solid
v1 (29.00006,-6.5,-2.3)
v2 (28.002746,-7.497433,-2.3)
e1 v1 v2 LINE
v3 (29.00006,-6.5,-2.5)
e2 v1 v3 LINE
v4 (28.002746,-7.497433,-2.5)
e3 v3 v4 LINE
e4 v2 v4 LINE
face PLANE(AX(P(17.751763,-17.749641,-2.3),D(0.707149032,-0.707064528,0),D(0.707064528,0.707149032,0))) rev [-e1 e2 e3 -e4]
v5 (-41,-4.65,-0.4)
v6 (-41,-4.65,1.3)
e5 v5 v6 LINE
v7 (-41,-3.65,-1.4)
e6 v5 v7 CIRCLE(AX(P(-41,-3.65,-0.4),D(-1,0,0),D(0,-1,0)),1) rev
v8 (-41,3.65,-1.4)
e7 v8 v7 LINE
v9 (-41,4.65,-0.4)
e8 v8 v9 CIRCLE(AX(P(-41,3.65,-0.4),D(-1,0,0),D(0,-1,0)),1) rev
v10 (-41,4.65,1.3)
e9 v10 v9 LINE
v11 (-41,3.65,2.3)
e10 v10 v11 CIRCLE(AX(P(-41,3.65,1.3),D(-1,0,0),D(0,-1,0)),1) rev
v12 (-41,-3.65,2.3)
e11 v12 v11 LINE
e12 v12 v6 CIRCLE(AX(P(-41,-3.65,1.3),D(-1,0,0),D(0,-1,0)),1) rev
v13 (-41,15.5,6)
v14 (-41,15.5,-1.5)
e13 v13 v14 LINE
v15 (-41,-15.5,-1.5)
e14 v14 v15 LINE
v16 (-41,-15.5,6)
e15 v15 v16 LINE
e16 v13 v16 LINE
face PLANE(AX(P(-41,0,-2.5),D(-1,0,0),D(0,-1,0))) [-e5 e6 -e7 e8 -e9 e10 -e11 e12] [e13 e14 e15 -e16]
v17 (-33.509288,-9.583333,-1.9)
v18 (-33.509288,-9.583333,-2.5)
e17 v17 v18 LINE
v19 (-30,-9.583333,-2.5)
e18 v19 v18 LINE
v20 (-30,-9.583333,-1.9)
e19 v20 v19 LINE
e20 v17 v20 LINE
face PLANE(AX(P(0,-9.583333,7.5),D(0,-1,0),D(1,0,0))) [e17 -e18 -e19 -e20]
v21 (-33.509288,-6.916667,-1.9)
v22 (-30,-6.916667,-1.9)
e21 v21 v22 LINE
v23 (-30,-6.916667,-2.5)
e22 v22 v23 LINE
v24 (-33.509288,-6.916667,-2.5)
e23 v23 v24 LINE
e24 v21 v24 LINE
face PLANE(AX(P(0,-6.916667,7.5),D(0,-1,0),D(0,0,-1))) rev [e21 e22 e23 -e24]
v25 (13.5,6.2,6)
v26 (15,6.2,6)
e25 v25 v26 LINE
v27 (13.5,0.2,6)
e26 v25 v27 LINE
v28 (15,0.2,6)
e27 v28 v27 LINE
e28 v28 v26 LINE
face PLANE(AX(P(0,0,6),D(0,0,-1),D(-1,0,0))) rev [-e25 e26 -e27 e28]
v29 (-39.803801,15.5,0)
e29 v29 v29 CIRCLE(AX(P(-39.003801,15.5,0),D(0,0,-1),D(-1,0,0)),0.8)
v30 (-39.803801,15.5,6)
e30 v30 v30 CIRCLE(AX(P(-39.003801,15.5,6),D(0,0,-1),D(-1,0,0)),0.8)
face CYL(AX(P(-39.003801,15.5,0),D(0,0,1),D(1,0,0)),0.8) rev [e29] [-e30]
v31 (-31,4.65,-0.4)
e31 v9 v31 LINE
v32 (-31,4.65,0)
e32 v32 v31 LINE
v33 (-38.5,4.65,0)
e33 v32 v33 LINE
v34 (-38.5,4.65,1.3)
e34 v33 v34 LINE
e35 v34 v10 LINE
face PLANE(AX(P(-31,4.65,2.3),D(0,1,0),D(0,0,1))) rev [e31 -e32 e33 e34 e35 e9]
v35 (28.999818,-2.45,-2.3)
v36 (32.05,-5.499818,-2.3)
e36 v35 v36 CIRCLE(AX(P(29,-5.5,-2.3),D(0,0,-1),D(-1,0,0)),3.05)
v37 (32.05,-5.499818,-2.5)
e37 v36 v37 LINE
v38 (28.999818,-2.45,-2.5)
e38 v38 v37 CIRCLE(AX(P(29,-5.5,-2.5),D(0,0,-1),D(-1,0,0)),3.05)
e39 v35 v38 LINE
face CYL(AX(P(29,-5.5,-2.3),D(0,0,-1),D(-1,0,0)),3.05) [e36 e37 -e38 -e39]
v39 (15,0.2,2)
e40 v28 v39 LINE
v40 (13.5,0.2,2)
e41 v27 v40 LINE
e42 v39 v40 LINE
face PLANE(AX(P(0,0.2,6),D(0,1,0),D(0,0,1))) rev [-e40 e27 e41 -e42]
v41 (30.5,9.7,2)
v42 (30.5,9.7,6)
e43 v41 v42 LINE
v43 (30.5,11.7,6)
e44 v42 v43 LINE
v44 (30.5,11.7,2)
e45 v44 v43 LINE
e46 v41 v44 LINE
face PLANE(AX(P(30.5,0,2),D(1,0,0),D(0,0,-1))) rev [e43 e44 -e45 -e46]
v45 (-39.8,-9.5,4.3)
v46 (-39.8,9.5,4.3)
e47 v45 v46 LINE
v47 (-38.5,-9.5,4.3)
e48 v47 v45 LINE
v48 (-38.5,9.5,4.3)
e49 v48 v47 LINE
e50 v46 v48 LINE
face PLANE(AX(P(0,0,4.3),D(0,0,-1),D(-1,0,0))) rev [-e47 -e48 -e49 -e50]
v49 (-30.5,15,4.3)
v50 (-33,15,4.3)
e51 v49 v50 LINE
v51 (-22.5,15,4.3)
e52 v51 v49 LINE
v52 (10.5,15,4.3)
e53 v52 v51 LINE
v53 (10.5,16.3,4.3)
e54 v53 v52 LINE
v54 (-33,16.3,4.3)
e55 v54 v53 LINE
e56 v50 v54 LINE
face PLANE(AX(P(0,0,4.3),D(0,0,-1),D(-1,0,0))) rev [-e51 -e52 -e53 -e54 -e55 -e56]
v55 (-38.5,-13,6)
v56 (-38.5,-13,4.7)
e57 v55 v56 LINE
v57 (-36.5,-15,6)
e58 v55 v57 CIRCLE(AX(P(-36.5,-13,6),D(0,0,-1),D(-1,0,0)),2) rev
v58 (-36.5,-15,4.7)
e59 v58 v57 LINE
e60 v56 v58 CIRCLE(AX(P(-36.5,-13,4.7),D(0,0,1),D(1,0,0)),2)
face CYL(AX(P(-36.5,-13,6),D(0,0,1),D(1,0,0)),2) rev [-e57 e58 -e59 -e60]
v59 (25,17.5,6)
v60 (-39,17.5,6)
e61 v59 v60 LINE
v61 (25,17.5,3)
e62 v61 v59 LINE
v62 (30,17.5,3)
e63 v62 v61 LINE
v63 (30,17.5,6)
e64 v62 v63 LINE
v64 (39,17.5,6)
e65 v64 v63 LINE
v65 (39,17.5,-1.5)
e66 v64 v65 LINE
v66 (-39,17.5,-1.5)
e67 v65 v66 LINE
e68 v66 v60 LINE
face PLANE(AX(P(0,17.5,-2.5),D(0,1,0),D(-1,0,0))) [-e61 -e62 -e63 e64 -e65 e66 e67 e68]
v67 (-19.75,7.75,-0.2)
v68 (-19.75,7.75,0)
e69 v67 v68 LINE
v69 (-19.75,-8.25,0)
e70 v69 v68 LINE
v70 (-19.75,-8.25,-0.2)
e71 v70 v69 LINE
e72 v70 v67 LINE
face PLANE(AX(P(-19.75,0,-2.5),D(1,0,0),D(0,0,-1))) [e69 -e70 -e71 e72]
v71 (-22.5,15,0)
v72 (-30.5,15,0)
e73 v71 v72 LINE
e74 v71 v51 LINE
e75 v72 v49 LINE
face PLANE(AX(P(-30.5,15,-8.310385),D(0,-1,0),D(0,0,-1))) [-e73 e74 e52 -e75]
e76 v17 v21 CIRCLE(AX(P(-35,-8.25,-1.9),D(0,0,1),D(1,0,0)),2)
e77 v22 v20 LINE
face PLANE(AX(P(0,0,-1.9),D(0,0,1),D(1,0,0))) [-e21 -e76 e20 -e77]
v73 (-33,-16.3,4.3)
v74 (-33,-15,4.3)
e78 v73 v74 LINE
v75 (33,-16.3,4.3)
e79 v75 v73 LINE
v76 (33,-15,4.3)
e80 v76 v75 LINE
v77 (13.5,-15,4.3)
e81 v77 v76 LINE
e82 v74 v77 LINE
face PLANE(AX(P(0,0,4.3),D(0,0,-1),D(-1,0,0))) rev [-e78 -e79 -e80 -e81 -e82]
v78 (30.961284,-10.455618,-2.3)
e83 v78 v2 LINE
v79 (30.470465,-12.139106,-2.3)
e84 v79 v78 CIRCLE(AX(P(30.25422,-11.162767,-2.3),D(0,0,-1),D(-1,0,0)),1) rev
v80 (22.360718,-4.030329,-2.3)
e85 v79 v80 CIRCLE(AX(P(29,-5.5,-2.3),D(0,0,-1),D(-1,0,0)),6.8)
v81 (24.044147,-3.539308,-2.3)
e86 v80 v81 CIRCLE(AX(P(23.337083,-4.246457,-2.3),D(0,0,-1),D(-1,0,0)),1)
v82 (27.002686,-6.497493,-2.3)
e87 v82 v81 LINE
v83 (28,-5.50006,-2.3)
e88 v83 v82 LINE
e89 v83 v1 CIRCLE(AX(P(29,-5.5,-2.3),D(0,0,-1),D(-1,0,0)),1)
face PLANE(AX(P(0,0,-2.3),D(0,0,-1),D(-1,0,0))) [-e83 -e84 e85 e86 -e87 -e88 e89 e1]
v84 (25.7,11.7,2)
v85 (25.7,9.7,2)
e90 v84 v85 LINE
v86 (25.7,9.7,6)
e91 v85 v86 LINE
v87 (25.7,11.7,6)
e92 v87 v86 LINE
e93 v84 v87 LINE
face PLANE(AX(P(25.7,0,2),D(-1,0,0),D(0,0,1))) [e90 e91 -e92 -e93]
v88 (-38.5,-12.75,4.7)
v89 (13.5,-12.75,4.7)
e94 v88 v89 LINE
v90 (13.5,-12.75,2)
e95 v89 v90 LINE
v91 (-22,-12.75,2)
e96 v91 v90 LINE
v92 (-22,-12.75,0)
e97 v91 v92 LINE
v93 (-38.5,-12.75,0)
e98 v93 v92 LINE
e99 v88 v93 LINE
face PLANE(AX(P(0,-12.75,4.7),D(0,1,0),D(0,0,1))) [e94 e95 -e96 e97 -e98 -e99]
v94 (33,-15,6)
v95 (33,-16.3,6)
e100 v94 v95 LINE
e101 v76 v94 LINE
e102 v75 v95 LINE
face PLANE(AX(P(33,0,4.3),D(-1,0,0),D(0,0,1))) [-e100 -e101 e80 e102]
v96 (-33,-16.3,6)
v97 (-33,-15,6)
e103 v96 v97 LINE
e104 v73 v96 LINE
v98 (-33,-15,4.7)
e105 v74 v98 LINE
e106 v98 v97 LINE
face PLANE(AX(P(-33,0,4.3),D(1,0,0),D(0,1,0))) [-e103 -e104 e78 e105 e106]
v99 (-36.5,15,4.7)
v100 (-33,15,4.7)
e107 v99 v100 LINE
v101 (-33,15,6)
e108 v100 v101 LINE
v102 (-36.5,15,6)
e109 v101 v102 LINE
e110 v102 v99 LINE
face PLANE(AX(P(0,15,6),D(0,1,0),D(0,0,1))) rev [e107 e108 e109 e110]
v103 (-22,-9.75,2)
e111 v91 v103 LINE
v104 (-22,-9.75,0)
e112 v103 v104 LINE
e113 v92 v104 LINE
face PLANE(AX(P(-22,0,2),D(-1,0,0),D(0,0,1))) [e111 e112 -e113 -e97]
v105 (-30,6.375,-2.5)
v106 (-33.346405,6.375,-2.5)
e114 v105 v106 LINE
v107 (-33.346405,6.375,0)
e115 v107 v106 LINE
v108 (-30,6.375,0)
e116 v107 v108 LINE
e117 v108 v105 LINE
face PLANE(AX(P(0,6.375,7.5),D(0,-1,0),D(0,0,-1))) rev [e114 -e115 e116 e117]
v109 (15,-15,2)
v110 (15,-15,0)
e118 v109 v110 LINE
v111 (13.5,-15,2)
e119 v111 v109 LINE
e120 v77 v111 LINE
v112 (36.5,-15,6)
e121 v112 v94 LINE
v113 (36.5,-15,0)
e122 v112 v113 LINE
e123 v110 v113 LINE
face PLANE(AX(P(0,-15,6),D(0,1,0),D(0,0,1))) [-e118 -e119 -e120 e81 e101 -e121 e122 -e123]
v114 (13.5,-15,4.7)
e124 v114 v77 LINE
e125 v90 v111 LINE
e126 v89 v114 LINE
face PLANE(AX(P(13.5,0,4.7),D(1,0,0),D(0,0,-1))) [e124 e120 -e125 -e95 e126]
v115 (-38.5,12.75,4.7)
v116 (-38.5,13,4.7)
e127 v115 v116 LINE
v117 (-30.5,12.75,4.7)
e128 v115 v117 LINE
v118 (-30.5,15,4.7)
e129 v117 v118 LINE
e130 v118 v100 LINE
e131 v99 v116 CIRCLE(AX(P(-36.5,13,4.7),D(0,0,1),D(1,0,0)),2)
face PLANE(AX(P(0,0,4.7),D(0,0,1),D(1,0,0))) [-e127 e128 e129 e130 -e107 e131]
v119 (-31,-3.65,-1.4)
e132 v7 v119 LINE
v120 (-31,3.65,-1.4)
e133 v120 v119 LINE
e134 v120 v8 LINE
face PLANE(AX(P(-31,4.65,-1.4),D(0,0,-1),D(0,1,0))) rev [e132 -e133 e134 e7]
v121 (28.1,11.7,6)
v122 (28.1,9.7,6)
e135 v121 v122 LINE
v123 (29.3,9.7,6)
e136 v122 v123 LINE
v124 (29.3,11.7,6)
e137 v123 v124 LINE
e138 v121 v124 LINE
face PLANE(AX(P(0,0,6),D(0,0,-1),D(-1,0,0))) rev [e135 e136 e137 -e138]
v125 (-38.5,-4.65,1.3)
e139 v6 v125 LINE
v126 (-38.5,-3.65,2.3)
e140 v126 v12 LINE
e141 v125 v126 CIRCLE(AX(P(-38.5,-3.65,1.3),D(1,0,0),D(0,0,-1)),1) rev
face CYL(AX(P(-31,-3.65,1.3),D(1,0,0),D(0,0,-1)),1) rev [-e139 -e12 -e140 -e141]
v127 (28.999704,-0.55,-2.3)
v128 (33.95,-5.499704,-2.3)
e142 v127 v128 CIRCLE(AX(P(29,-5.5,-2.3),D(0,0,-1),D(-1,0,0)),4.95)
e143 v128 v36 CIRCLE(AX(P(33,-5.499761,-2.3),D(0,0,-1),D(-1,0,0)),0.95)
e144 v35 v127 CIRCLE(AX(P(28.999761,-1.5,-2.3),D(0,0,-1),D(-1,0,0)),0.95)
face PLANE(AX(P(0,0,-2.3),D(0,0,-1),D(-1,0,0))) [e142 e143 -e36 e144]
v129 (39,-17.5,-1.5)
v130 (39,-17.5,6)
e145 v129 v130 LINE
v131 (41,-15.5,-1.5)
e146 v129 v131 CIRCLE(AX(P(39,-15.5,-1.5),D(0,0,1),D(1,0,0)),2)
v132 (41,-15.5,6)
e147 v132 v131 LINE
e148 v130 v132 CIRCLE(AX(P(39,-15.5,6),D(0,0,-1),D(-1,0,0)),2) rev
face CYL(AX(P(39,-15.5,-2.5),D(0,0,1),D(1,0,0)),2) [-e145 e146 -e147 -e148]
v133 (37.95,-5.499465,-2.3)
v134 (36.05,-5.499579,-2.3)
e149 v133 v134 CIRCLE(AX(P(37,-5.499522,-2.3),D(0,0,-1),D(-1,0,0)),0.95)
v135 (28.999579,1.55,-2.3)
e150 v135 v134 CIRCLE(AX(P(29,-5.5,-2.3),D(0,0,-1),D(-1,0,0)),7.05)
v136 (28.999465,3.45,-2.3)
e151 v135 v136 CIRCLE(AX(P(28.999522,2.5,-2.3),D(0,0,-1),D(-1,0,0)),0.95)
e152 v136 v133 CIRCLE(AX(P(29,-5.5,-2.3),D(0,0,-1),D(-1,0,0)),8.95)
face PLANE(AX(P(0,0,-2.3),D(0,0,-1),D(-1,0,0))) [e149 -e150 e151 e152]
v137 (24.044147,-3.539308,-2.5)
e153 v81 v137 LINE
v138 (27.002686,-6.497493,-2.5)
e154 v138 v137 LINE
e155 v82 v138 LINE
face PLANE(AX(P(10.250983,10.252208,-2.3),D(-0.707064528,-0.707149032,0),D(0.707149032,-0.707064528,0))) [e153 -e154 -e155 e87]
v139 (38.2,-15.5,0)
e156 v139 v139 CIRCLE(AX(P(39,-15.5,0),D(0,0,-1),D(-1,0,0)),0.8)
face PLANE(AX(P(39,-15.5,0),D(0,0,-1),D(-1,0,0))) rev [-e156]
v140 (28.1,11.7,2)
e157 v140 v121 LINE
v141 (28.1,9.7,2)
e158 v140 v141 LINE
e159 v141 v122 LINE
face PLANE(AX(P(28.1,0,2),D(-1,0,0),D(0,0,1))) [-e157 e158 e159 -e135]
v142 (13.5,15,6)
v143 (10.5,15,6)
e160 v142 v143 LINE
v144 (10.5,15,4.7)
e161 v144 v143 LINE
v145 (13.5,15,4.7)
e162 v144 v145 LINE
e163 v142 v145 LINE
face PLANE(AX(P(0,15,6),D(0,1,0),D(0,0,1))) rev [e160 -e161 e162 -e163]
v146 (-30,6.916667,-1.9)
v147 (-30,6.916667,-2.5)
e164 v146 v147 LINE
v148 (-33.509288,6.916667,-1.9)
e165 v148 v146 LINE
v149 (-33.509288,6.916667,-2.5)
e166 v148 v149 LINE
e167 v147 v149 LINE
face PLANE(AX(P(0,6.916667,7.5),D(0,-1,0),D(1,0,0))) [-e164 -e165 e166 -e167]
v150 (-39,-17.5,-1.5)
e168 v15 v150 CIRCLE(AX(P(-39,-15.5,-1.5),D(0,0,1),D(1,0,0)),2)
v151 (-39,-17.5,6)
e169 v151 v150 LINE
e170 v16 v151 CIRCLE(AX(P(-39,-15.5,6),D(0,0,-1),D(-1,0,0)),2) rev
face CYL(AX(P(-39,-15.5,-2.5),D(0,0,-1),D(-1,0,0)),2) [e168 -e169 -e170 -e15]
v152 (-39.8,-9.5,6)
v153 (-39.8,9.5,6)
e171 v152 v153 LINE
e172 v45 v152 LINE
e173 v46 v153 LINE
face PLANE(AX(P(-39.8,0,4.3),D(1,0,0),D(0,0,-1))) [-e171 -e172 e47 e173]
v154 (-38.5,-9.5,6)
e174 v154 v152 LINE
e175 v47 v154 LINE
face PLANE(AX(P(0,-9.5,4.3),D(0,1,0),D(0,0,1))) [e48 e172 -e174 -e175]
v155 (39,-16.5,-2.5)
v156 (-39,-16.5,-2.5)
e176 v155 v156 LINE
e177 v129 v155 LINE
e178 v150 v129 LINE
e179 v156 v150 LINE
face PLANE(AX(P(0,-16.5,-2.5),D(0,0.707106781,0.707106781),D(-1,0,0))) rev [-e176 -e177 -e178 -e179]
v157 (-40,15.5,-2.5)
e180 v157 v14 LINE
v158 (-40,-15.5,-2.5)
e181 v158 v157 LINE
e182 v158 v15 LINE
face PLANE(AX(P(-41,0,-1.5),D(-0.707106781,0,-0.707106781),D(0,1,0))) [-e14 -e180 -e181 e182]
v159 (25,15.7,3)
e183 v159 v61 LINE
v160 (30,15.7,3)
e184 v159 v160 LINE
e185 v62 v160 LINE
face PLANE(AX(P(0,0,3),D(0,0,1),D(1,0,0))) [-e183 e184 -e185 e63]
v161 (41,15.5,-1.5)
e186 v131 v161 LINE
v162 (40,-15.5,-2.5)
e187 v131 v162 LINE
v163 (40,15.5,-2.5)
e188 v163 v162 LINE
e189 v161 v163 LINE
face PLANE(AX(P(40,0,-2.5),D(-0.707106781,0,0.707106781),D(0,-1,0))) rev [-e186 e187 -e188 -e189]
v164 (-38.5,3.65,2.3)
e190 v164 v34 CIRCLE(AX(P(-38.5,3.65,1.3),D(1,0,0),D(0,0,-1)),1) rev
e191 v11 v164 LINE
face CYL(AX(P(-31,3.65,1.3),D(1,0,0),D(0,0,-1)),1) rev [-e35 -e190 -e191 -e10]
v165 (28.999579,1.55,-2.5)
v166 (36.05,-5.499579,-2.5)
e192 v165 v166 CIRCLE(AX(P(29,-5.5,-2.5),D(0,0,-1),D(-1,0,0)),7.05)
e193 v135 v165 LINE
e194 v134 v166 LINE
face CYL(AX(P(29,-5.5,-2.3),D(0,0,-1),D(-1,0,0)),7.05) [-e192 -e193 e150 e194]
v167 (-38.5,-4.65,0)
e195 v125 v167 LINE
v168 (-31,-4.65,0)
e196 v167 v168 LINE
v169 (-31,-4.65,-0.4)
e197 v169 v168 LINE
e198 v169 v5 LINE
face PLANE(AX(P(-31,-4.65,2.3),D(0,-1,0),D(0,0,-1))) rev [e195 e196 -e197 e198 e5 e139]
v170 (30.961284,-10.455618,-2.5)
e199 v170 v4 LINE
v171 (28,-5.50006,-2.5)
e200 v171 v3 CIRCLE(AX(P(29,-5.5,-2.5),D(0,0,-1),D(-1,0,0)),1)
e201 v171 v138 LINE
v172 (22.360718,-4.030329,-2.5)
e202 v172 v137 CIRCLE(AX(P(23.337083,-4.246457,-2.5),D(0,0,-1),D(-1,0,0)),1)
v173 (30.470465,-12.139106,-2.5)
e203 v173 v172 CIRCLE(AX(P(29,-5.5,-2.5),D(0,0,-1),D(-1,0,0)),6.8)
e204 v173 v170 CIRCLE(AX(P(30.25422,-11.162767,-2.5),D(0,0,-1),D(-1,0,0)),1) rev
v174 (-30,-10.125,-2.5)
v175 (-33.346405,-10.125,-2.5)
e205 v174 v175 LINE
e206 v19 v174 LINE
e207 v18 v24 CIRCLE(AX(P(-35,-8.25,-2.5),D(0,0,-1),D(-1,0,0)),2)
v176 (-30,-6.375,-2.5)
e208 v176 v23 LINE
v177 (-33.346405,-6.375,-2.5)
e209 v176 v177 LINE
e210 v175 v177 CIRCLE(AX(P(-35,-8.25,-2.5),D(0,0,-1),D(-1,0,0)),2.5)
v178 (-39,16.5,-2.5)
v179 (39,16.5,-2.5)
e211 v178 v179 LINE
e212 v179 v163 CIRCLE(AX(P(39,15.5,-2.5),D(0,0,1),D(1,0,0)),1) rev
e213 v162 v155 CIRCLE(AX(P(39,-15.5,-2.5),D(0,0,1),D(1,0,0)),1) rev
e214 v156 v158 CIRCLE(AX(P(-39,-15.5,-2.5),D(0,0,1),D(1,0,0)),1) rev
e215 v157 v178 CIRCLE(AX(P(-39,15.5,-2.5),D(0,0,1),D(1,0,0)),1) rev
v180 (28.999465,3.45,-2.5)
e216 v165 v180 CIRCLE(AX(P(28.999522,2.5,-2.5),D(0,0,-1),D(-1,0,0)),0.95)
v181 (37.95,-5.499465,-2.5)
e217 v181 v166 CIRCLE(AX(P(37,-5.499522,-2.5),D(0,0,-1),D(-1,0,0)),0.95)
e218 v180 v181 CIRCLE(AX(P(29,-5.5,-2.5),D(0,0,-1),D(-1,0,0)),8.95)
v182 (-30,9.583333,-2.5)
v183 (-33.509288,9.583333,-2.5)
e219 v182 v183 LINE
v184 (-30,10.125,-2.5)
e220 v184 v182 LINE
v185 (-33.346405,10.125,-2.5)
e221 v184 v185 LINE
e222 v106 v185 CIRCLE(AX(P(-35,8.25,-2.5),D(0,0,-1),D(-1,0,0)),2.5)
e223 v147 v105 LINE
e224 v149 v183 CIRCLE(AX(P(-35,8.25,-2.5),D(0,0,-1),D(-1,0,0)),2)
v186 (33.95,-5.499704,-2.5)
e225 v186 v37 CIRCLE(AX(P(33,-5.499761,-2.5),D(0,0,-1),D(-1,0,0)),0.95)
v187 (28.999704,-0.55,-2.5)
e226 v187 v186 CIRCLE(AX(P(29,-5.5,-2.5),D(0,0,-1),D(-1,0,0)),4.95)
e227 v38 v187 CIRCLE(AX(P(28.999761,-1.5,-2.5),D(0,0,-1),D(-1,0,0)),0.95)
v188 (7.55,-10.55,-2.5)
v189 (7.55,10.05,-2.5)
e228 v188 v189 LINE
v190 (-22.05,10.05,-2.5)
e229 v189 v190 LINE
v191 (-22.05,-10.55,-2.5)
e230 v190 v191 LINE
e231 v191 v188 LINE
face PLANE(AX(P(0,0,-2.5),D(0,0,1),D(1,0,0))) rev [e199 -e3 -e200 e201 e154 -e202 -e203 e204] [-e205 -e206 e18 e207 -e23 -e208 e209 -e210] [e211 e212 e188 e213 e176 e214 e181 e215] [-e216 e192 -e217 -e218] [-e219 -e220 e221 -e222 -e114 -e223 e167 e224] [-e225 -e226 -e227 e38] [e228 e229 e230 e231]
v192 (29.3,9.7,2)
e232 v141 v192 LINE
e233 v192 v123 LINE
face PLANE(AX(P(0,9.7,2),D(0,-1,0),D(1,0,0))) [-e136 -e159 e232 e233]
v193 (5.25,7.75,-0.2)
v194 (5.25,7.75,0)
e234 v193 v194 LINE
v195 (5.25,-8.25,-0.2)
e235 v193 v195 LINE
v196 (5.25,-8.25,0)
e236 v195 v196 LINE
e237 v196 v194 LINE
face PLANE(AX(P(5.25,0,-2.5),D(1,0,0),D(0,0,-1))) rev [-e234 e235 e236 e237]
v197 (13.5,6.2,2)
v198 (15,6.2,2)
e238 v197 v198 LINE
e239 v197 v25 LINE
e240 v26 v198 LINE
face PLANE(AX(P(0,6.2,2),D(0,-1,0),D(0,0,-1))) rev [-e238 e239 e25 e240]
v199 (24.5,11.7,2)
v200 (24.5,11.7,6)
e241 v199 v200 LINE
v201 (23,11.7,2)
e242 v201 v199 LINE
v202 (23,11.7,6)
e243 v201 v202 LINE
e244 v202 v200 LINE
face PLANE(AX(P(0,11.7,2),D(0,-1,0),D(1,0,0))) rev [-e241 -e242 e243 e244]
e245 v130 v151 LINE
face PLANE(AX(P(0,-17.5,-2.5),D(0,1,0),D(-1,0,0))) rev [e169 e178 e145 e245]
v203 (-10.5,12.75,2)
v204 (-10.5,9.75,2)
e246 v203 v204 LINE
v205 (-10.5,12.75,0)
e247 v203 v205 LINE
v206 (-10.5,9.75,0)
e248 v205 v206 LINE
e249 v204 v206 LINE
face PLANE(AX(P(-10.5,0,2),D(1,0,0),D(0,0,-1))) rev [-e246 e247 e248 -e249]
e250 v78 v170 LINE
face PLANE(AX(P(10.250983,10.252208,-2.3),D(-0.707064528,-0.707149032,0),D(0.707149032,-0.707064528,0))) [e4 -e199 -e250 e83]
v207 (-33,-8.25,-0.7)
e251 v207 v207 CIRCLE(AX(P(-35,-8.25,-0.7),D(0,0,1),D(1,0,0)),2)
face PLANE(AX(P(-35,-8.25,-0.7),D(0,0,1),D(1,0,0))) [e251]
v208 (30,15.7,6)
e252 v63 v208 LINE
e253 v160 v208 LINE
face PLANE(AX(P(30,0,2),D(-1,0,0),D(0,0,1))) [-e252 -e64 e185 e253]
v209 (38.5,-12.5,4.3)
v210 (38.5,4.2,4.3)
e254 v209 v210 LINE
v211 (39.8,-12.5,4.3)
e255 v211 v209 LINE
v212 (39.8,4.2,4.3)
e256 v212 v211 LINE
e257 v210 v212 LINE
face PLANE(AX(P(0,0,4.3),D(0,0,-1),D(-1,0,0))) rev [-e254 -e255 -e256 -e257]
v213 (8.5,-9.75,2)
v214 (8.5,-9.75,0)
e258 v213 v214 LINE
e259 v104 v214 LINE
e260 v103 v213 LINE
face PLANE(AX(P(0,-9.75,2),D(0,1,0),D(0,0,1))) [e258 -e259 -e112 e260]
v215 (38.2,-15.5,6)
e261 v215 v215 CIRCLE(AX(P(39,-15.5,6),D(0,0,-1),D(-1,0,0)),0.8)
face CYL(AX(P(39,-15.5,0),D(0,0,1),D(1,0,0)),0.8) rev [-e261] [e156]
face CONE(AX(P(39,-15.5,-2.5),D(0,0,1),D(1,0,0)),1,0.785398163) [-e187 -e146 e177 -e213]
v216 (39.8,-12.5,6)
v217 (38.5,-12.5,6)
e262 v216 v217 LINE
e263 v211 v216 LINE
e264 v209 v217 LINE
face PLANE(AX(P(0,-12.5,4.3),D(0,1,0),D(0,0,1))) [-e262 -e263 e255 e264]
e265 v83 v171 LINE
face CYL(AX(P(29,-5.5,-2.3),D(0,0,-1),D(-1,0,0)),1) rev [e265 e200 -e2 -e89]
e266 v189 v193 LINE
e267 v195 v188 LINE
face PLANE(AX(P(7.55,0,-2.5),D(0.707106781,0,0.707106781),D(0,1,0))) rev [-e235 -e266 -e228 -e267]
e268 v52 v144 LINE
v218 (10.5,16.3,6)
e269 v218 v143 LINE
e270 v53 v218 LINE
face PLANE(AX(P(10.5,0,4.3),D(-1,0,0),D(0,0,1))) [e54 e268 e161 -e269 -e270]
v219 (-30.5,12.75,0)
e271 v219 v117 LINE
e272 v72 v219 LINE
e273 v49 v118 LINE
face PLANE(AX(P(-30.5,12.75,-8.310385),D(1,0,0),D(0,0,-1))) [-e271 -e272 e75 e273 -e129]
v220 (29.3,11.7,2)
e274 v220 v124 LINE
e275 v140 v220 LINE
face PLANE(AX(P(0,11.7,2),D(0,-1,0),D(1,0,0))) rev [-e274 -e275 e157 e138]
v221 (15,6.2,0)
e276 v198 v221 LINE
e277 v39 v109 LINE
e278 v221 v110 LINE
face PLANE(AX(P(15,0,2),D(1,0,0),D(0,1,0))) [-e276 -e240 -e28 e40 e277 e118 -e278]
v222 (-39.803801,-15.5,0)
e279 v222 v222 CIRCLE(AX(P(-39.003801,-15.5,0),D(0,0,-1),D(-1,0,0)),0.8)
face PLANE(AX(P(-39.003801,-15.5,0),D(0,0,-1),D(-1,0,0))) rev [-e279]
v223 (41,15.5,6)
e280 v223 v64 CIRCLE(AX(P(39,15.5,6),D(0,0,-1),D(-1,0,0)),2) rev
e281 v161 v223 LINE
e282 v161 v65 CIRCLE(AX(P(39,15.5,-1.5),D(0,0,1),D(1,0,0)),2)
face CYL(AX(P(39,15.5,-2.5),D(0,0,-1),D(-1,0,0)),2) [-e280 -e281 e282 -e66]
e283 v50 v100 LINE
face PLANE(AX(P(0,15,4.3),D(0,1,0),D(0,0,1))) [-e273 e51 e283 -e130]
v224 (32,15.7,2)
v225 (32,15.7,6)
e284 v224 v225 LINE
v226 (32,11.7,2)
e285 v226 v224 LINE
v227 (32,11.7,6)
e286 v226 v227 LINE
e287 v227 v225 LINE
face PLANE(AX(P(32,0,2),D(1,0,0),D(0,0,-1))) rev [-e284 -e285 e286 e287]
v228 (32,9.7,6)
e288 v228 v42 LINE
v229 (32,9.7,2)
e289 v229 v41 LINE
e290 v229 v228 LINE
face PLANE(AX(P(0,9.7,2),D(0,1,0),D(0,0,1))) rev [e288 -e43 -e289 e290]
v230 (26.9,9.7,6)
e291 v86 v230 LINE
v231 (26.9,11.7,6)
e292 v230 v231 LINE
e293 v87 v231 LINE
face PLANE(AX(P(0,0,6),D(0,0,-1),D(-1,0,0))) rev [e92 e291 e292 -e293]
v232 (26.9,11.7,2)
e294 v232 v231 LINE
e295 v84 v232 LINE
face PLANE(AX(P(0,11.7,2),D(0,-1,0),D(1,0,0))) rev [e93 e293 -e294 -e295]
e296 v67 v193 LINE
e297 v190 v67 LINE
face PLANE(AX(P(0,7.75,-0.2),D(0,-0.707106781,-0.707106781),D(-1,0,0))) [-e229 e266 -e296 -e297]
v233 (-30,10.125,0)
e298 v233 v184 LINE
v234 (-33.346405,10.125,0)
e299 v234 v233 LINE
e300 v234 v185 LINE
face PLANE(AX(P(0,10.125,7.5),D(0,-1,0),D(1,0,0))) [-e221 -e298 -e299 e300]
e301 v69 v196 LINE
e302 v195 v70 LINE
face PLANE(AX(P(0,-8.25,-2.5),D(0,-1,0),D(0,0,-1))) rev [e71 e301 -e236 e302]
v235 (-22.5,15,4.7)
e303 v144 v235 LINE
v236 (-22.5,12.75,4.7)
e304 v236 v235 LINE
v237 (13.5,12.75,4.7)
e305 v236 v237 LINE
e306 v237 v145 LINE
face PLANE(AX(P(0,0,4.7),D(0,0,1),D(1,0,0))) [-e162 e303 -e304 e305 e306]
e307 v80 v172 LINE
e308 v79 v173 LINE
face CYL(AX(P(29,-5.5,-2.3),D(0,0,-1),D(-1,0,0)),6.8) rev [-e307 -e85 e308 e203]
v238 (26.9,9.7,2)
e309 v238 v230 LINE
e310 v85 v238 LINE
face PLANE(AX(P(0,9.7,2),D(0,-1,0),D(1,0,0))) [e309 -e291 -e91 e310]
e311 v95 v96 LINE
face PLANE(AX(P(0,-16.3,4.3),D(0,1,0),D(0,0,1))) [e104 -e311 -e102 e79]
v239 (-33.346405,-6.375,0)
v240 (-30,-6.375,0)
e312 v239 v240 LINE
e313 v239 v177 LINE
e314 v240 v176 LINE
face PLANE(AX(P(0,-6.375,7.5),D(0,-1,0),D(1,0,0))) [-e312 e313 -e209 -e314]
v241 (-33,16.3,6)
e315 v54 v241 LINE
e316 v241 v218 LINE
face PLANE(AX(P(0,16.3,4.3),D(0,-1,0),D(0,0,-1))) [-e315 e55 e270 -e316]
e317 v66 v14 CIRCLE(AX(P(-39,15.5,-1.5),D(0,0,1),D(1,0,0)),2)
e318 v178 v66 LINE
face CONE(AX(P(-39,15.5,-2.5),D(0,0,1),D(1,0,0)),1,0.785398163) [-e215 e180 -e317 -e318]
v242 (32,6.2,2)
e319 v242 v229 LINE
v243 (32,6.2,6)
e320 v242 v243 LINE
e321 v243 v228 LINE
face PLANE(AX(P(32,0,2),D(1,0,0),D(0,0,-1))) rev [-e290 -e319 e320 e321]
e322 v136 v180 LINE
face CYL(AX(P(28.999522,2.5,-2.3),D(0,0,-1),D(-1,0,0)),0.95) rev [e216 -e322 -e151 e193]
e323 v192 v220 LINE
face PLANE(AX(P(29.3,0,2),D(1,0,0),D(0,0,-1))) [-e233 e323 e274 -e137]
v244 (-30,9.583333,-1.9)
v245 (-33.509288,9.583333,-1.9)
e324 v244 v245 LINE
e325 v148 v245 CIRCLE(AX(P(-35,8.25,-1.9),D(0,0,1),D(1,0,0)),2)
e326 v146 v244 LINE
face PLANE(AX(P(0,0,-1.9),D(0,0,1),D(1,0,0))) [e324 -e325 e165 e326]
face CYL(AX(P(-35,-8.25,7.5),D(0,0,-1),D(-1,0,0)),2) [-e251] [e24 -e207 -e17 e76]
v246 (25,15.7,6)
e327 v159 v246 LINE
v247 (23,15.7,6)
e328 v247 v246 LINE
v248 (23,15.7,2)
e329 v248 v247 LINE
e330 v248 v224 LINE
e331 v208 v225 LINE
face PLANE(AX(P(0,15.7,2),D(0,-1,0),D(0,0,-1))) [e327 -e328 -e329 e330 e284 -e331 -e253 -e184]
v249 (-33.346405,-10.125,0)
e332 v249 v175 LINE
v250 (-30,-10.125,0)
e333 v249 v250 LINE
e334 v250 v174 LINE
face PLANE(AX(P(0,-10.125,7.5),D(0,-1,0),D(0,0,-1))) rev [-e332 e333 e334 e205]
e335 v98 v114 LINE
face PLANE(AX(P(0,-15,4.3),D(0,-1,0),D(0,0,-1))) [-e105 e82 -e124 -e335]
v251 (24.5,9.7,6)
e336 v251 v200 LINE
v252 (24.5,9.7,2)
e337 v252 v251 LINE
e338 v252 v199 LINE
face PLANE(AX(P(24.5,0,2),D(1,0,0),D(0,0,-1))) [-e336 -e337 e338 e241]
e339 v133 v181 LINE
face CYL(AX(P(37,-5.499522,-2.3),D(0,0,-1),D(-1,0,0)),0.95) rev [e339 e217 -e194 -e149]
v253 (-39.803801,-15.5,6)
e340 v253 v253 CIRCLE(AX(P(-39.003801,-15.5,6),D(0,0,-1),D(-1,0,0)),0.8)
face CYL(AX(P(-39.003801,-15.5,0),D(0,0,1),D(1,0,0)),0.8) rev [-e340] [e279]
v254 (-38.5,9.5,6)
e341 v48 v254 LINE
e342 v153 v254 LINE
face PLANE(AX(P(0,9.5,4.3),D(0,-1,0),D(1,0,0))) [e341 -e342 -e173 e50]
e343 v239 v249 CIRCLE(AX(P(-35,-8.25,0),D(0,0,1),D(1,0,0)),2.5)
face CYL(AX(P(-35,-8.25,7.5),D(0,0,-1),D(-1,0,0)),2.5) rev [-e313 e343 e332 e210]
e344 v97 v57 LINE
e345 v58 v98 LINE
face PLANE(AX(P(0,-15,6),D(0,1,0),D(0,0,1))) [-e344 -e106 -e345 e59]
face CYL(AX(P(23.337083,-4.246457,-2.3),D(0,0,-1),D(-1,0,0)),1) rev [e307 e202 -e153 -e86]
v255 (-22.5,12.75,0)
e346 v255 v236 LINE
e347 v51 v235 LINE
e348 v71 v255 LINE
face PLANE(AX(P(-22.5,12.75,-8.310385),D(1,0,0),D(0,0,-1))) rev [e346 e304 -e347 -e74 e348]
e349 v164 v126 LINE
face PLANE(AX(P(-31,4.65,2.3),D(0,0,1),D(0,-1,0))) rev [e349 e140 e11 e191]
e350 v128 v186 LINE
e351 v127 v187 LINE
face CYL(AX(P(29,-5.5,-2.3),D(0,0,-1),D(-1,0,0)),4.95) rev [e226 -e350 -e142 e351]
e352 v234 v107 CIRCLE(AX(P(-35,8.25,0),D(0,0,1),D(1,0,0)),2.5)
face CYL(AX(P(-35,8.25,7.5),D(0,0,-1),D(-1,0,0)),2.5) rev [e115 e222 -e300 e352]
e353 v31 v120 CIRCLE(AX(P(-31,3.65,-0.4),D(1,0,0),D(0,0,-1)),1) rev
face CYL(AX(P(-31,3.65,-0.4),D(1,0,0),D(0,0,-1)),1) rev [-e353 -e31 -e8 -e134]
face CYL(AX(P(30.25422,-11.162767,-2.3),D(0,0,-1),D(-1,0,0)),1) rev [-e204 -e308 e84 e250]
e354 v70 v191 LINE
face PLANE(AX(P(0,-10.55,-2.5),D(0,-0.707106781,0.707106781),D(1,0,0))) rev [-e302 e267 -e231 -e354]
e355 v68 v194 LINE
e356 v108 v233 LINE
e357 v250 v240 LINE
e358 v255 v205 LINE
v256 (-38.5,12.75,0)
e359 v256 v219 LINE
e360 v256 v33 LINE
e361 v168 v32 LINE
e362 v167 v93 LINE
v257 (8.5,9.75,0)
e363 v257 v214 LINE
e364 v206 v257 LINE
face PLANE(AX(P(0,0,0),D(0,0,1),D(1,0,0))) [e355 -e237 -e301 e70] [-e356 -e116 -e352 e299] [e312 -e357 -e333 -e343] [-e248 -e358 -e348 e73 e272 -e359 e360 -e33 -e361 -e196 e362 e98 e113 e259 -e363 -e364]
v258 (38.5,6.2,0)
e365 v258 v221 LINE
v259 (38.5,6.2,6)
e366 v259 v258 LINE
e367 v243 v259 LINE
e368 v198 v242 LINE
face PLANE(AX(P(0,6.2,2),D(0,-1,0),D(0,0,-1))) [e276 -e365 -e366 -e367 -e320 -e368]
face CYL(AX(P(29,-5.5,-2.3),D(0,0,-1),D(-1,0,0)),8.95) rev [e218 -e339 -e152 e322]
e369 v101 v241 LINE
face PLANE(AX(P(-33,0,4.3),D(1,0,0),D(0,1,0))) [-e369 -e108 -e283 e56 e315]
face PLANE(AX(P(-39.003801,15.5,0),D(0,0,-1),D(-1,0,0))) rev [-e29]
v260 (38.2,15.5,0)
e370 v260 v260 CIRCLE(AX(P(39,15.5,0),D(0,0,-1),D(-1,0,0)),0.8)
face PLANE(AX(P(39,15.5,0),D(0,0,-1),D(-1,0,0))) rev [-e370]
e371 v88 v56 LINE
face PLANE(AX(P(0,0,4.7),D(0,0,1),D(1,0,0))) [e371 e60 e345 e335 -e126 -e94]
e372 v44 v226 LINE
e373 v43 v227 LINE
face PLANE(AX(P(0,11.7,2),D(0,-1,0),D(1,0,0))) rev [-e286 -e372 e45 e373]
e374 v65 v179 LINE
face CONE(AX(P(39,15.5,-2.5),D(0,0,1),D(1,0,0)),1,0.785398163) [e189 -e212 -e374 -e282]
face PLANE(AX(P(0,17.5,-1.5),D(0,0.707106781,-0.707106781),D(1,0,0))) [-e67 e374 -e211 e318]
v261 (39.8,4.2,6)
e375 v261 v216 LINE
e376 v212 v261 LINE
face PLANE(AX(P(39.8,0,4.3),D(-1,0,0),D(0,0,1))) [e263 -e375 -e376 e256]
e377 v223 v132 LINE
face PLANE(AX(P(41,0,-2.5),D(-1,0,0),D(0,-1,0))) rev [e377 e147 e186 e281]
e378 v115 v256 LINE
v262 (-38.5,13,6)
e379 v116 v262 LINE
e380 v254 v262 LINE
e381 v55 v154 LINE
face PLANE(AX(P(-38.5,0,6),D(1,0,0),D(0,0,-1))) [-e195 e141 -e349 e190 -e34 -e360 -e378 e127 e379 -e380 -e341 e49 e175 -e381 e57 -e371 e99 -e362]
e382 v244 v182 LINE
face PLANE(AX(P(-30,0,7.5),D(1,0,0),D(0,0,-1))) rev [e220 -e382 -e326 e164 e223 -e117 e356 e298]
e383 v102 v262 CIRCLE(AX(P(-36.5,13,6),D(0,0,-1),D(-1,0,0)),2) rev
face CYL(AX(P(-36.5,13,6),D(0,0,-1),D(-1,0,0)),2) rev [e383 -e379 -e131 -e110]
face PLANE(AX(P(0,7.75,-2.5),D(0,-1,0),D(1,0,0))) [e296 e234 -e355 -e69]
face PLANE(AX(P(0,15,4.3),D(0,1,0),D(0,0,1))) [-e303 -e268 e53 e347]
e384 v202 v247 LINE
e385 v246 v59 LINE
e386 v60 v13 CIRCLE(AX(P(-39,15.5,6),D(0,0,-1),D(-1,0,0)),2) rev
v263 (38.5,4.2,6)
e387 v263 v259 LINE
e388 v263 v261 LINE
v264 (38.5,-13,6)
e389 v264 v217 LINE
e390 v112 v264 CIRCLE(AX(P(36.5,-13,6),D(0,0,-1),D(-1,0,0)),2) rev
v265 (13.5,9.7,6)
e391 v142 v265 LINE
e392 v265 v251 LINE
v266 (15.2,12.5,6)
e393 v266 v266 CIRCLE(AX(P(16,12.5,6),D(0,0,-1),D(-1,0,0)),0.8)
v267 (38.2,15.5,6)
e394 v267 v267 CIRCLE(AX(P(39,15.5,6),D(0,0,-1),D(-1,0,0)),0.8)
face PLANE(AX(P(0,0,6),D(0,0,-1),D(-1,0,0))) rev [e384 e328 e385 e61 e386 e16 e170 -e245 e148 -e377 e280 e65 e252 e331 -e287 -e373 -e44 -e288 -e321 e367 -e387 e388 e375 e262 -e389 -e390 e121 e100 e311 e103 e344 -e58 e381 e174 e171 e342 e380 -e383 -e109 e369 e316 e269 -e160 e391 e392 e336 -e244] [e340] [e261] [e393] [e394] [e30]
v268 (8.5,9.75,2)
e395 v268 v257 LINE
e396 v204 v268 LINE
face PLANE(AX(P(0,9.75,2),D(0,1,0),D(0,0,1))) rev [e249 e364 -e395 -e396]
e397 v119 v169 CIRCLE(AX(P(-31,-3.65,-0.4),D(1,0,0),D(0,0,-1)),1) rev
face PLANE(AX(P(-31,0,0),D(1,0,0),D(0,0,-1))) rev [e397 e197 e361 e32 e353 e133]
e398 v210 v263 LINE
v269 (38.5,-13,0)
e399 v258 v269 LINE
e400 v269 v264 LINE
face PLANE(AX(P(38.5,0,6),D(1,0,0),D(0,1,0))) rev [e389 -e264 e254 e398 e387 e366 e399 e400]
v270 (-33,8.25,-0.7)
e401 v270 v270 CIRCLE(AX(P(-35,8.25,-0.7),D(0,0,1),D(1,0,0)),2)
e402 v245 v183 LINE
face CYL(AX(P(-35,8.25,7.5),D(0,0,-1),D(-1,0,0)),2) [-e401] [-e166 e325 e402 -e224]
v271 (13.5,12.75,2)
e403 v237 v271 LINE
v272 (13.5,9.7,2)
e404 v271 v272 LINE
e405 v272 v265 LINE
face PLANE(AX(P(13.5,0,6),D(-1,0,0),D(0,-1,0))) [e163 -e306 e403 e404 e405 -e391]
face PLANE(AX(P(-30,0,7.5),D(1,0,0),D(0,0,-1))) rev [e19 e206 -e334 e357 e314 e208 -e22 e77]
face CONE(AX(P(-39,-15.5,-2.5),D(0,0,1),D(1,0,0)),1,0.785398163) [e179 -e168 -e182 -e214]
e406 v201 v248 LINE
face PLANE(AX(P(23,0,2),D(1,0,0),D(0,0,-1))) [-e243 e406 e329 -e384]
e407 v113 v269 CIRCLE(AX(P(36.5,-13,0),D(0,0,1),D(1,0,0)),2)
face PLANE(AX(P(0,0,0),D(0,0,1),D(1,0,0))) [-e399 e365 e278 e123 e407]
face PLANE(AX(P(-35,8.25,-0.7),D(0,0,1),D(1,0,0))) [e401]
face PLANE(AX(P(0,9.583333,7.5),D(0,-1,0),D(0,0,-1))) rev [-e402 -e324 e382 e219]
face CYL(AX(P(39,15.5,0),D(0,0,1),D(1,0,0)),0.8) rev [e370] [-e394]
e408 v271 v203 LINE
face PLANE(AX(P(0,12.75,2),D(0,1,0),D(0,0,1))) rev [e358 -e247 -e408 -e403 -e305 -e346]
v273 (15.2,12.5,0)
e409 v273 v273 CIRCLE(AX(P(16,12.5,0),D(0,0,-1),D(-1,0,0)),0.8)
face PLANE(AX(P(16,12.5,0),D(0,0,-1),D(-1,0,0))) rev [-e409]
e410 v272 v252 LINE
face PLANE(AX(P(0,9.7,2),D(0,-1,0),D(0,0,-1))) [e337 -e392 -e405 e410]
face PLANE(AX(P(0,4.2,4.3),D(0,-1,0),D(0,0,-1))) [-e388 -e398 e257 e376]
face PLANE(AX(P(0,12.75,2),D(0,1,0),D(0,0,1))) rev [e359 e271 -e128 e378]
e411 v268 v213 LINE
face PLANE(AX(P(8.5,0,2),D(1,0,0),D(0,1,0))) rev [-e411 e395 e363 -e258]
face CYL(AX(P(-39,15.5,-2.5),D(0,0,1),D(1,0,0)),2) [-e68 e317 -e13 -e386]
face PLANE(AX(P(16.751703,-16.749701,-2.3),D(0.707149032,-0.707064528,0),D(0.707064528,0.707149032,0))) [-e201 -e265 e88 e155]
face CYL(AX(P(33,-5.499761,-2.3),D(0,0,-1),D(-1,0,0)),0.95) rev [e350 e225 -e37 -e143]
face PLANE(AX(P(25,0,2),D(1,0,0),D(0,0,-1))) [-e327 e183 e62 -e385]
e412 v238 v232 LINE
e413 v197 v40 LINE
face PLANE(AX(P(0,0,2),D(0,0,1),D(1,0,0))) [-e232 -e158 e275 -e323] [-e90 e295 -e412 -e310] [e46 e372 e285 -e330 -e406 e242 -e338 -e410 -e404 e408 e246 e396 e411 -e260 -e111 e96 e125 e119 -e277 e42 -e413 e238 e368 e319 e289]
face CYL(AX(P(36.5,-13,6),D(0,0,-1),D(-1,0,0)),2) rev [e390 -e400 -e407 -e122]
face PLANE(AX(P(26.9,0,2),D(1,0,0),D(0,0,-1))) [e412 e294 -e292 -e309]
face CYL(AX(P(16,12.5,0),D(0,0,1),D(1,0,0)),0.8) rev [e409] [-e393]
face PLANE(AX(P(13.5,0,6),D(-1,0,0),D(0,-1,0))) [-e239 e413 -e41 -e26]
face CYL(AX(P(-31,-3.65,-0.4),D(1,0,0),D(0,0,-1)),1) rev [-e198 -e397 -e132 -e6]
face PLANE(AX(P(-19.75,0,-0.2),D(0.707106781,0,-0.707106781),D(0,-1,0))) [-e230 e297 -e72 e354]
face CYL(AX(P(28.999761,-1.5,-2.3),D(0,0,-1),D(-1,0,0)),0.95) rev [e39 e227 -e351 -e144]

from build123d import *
from build123d.topology import SkipClean

# Parameters (mm, degrees)
SKETCH1_W                = 82
SKETCH1_H                = 35
SKETCH1_W_2              = 25
SKETCH1_H_2              = 16
BOSS_EXTRUDE1_DEPTH      = 2.5
BOSS_EXTRUDE2_DEPTH      = 2
SKETCH1_4_W              = 82
SKETCH1_4_H              = 35
SKETCH1_4_W_2            = 1.5
SKETCH1_4_H_2            = 6
BOSS_EXTRUDE3_DEPTH      = 6
BOSS_EXTRUDE4_DEPTH      = 4.7
SKETCH3_W                = 3.7
SKETCH3_H                = 9.3
CUT_EXTRUDE1_DEPTH       = 10
FILLET1_R                = 1
CUT_EXTRUDE2_DEPTH       = 10
CUT_EXTRUDE5_START       = -2.5
CUT_EXTRUDE5_DEPTH       = 0.7
SKETCH8_W                = 5
SKETCH8_H                = 1.8
SKETCH8_W_2              = 9
SKETCH8_H_2              = 4
CUT_EXTRUDE10_DEPTH      = 4
BOSS_EXTRUDE7_START      = 6
SKETCH1_7_W              = 82
SKETCH1_7_H              = 35
SKETCH1_7_W_2            = 1.5
SKETCH1_7_H_2            = 6
BOSS_EXTRUDE7_DEPTH      = 6
BOSS_EXTRUDE9_START      = -4
SKETCH8_4_W              = 5
SKETCH8_4_H              = 1.8
BOSS_EXTRUDE9_DEPTH      = 1
BOSS_EXTRUDE10_START     = 12
SKETCH1_8_W              = 82
SKETCH1_8_H              = 35
SKETCH1_8_W_2            = 25
SKETCH1_8_H_2            = 16
SKETCH1_8_W_3            = 1.5
SKETCH1_8_H_3            = 6
BOSS_EXTRUDE10_DEPTH     = 2.5
FILLET3_R                = 2
CHAMFER1_SIZE            = 1
CUT_EXTRUDE14_DEPTH      = 6
CUT_EXTRUDE14_DEPTH_BACK = 33
SKETCH10_R               = 0.8
CUT_EXTRUDE12_START      = -17
SKETCH9_2_W              = 121.746640378
SKETCH9_2_H              = 87.215043388
CUT_EXTRUDE12_DEPTH      = 8.5
CUT_EXTRUDE16_START      = -6
SKETCH14_W               = 1.3
SKETCH14_H               = 19
SKETCH14_W_2             = 66
SKETCH14_H_2             = 1.3
SKETCH14_W_3             = 43.5
SKETCH14_H_3             = 16.7
CUT_EXTRUDE16_DEPTH      = 1.7
CUT_EXTRUDE17_START      = -1.2
CUT_EXTRUDE17_DEPTH      = 1.2
SKETCH16_W               = 8
SKETCH16_H               = 2.25
CUT_EXTRUDE18_DEPTH      = 4.7
CHAMFER2_SIZE            = 2.3
CUT_EXTRUDE19_START      = -0.2
CUT_EXTRUDE19_DEPTH      = 0.2


# Read off the part's stored shape, not the designer's step: Cut-Extrude5, Cut-Extrude19
with BuildPart() as part:
    # Sketch1 → Boss-Extrude1 (new body)
    with BuildSketch(Plane.XY):
        Rectangle(SKETCH1_W, SKETCH1_H)
        with Locations((-7.25, -0.25)):
            Rectangle(SKETCH1_W_2, SKETCH1_H_2, mode=Mode.SUBTRACT)
    extrude(amount=-BOSS_EXTRUDE1_DEPTH)

    # Sketch1<3> → Boss-Extrude2 (add)
    with BuildSketch(Plane.XY):
        Polygon((-38.5, 15), (-38.5, 12.75), (-10.5, 12.75), (-10.5, 9.75), (8.5, 9.75), (8.5, -9.75), (-22, -9.75), (-22, -12.75), (13.5, -12.75), (13.5, -15), (15, -15), (15, 6.2), (38.5, 6.2), (38.5, 15), align=None)
    extrude(amount=BOSS_EXTRUDE2_DEPTH)

    # Sketch1<4> → Boss-Extrude3 (add)
    # profile 1 of 3: a face of its own
    with BuildSketch(Plane.XY):
        Rectangle(SKETCH1_4_W, SKETCH1_4_H)
        Polygon((-38.5, -12.75), (-38.5, 12.75), (-38.5, 15), (13.5, 15), (38.5, 15), (38.5, 6.2), (38.5, -15), (15, -15), (13.5, -15), (-38.5, -15), align=None, mode=Mode.SUBTRACT)
    # profile 2 of 3: a face of its own
    with BuildSketch(Plane.XY):
        Polygon((13.5, 15), (13.5, 12.75), (13.5, 6.2), (15, 6.2), (38.5, 6.2), (38.5, 15), align=None)
    # profile 3 of 3: a face of its own
    with BuildSketch(Plane.XY):
        with Locations((14.25, 3.2)):
            Rectangle(SKETCH1_4_W_2, SKETCH1_4_H_2)
    extrude(amount=BOSS_EXTRUDE3_DEPTH)

    # Sketch1<5> → Boss-Extrude4 (add)
    with BuildSketch(Plane.XY):
        Polygon((-38.5, 12.75), (-10.5, 12.75), (13.5, 12.75), (13.5, 15), (-38.5, 15), align=None)
        Polygon((-22, -12.75), (-38.5, -12.75), (-38.5, -15), (13.5, -15), (13.5, -12.75), align=None)
    extrude(amount=BOSS_EXTRUDE4_DEPTH)

    # Sketch3 → Cut-Extrude1 (cut)
    with BuildSketch(Plane.ZY.offset(41)):
        with Locations((0.45, 0)):
            Rectangle(SKETCH3_W, SKETCH3_H)
    extrude(amount=-CUT_EXTRUDE1_DEPTH, mode=Mode.SUBTRACT)

    # Fillet1
    fillet1_edges = [part.edges().sort_by_distance(p)[0] for p in [
        (-36, -4.65, -1.4),
        (-36, 4.65, -1.4),
        (-39.75, 4.65, 2.3),
        (-39.75, -4.65, 2.3),
    ]]
    fillet(fillet1_edges, radius=FILLET1_R)

    # Sketch4 → Cut-Extrude2 (cut)
    with BuildSketch(Plane(origin=(0, 0, -2.5), x_dir=(-1, 0, 0), z_dir=(0, 0, -1))):
        with BuildLine():
            Line((35, 5.75), (35, 6.25))
            ThreePointArc((35, 6.25), (34.183503419, 6.424258142), (33.509288015, 6.916666667))
            Line((33.509288015, 6.916666667), (30, 6.916666667))
            Line((30, 6.916666667), (30, 6.375))
            Line((30, 6.375), (33.346405431, 6.375))
            ThreePointArc((33.346405431, 6.375), (34.116116524, 5.911464133), (35, 5.75))
        make_face()
        with BuildLine():
            ThreePointArc((33.509288015, 9.583333333), (36.825741858, 9.066496581), (35, 6.25))
            Line((35, 6.25), (35, 5.75))
            ThreePointArc((35, 5.75), (37.338535867, 9.133883476), (33.346405431, 10.125))
            Line((33.346405431, 10.125), (30, 10.125))
            Line((30, 10.125), (30, 9.583333333))
            Line((30, 9.583333333), (33.509288015, 9.583333333))
        make_face()
        with BuildLine():
            ThreePointArc((33.346405431, -10.125), (37.338535867, -9.133883476), (35, -5.75))
            Line((35, -5.75), (35, -6.25))
            ThreePointArc((35, -6.25), (36.825741858, -9.066496581), (33.509288015, -9.583333333))
            Line((33.509288015, -9.583333333), (30, -9.583333333))
            Line((30, -9.583333333), (30, -10.125))
            Line((30, -10.125), (33.346405431, -10.125))
        make_face()
        with BuildLine():
            Line((35, -6.25), (35, -5.75))
            ThreePointArc((35, -5.75), (34.116116524, -5.911464133), (33.346405431, -6.375))
            Line((33.346405431, -6.375), (30, -6.375))
            Line((30, -6.375), (30, -6.916666667))
            Line((30, -6.916666667), (33.509288015, -6.916666667))
            ThreePointArc((33.509288015, -6.916666667), (34.183503419, -6.424258142), (35, -6.25))
        make_face()
    extrude(amount=-CUT_EXTRUDE2_DEPTH, mode=Mode.SUBTRACT)

    # Cut-Extrude5 outline → Cut-Extrude5 (cut)
    with BuildSketch(Plane(origin=(0, 0, -2.5), x_dir=(-1, 0, 0), z_dir=(0, 0, -1)).offset(CUT_EXTRUDE5_START)):
        with BuildLine():
            Line((33.509288015, -6.916666667), (30, -6.916666667))
            Line((30, -6.916666667), (30, -9.583333333))
            Line((30, -9.583333333), (33.509288015, -9.583333333))
            ThreePointArc((33.509288015, -9.583333333), (37, -8.25), (33.509288015, -6.916666667))
        make_face()
        with BuildLine():
            Line((33.509288015, 9.583333333), (30, 9.583333333))
            Line((30, 9.583333333), (30, 6.916666667))
            Line((30, 6.916666667), (33.509288015, 6.916666667))
            ThreePointArc((33.509288015, 6.916666667), (37, 8.25), (33.509288015, 9.583333333))
        make_face()
    extrude(amount=CUT_EXTRUDE5_DEPTH, mode=Mode.SUBTRACT)

    # Sketch8 → Cut-Extrude10 (cut)
    with BuildSketch(Plane.XY.offset(6)):
        with Locations((27.5, 16.6)):
            Rectangle(SKETCH8_W, SKETCH8_H)
        with Locations((27.5, 13.7)):
            Rectangle(SKETCH8_W_2, SKETCH8_H_2)
        Polygon((25.7, 11.7), (24.5, 11.7), (24.5, 9.7), (23, 9.7), (23, 6.2), (32, 6.2), (32, 9.7), (30.5, 9.7), (30.5, 11.7), (29.3, 11.7), (29.3, 9.7), (28.1, 9.7), (28.1, 11.7), (26.9, 11.7), (26.9, 9.7), (25.7, 9.7), align=None)
        Polygon((23, 6.2), (23, 9.7), (13.5, 9.7), (13.5, 6.2), (15, 6.2), align=None)
    extrude(amount=-CUT_EXTRUDE10_DEPTH, mode=Mode.SUBTRACT)

    # Sketch1<7> → Boss-Extrude7 (add)
    # profile 1 of 3: a face of its own
    with BuildSketch(Plane.XY.offset(BOSS_EXTRUDE7_START)):
        Rectangle(SKETCH1_7_W, SKETCH1_7_H)
        Polygon((-38.5, -15), (38.5, -15), (38.5, 6.2), (38.5, 15), (-38.5, 15), (-38.5, 12.75), (-38.5, -12.75), align=None, mode=Mode.SUBTRACT)
    # profile 2 of 3: a face of its own
    with BuildSketch(Plane.XY.offset(BOSS_EXTRUDE7_START)):
        Polygon((13.5, 15), (13.5, 12.75), (13.5, 6.2), (15, 6.2), (38.5, 6.2), (38.5, 15), align=None)
    # profile 3 of 3: a face of its own
    with BuildSketch(Plane.XY.offset(BOSS_EXTRUDE7_START)):
        with Locations((14.25, 3.2)):
            Rectangle(SKETCH1_7_W_2, SKETCH1_7_H_2)
    extrude(amount=BOSS_EXTRUDE7_DEPTH)

    # Sketch8<4> → Boss-Extrude9 (add)
    with BuildSketch(Plane.XY.offset(6).offset(BOSS_EXTRUDE9_START)):
        with Locations((27.5, 16.6)):
            Rectangle(SKETCH8_4_W, SKETCH8_4_H)
    extrude(amount=BOSS_EXTRUDE9_DEPTH)

    # Sketch1<8> → Boss-Extrude10 (add)
    # profile 1 of 10: a face of its own
    with BuildSketch(Plane.XY.offset(BOSS_EXTRUDE10_START)):
        Rectangle(SKETCH1_8_W, SKETCH1_8_H)
        Polygon((-38.5, -15), (38.5, -15), (38.5, 6.2), (38.5, 15), (-38.5, 15), (-38.5, 12.75), (-38.5, -12.75), align=None, mode=Mode.SUBTRACT)
    # profile 2 of 10: a face of its own
    with BuildSketch(Plane.XY.offset(BOSS_EXTRUDE10_START)):
        Polygon((-22, -12.75), (-38.5, -12.75), (-38.5, -15), (13.5, -15), (13.5, -12.75), align=None)
    # profile 3 of 10: a face of its own
    with BuildSketch(Plane.XY.offset(BOSS_EXTRUDE10_START)):
        Polygon((-10.5, 9.75), (-10.5, 12.75), (-38.5, 12.75), (-38.5, -12.75), (-22, -12.75), (-22, -9.75), (8.5, -9.75), (8.5, 9.75), align=None)
        with Locations((-7.25, -0.25)):
            Rectangle(SKETCH1_8_W_2, SKETCH1_8_H_2, mode=Mode.SUBTRACT)
    # profile 4 of 10: a face of its own
    with BuildSketch(Plane.XY.offset(BOSS_EXTRUDE10_START)):
        Polygon((13.5, 12.75), (-10.5, 12.75), (-10.5, 9.75), (8.5, 9.75), (8.5, -9.75), (-22, -9.75), (-22, -12.75), (13.5, -12.75), (13.5, 0.2), (13.5, 6.2), align=None)
    # profile 5 of 10: a face of its own
    with BuildSketch(Plane.XY.offset(BOSS_EXTRUDE10_START)):
        Polygon((-38.5, 12.75), (-10.5, 12.75), (13.5, 12.75), (13.5, 15), (-38.5, 15), align=None)
    # profile 6 of 10: a face of its own
    with BuildSketch(Plane.XY.offset(BOSS_EXTRUDE10_START)):
        with Locations((-7.25, -0.25)):
            Rectangle(SKETCH1_8_W_2, SKETCH1_8_H_2)
    # profile 7 of 10: a face of its own
    with BuildSketch(Plane.XY.offset(BOSS_EXTRUDE10_START)):
        Polygon((38.5, 6.2), (15, 6.2), (15, 0.2), (15, -15), (38.5, -15), align=None)
    # profile 8 of 10: a face of its own
    with BuildSketch(Plane.XY.offset(BOSS_EXTRUDE10_START)):
        Polygon((15, 0.2), (13.5, 0.2), (13.5, -12.75), (13.5, -15), (15, -15), align=None)
    # profile 9 of 10: a face of its own
    with BuildSketch(Plane.XY.offset(BOSS_EXTRUDE10_START)):
        Polygon((13.5, 15), (13.5, 12.75), (13.5, 6.2), (15, 6.2), (38.5, 6.2), (38.5, 15), align=None)
    # profile 10 of 10: a face of its own
    with BuildSketch(Plane.XY.offset(BOSS_EXTRUDE10_START)):
        with Locations((14.25, 3.2)):
            Rectangle(SKETCH1_8_W_3, SKETCH1_8_H_3)
    extrude(amount=BOSS_EXTRUDE10_DEPTH)

    # Fillet3
    fillet3_edges = [part.edges().sort_by_distance(p)[0] for p in [
        (41, 17.5, 6),
        (41, -17.5, 6),
        (-41, -17.5, 6),
        (-41, 17.5, 6),
        (-38.5, -15, 8.35),
        (38.5, -15, 6),
        (-38.5, 15, 8.35),
    ]]
    fillet(fillet3_edges, radius=FILLET3_R)

    # Chamfer1
    chamfer1_edges = [part.edges().sort_by_distance(p)[0] for p in [
        (0, 17.5, 14.5),
        (0, 17.5, -2.5),
        (41, 0, 14.5),
        (-41, 0, 14.5),
        (0, -17.5, 14.5),
        (40.414213562, -16.914213562, 14.5),
        (40.414213562, 16.914213562, 14.5),
        (-40.414213562, -16.914213562, 14.5),
        (-40.414213562, 16.914213562, 14.5),
        (-41, 0, -2.5),
        (41, 0, -2.5),
        (0, -17.5, -2.5),
        (40.414213562, -16.914213562, -2.5),
        (40.414213562, 16.914213562, -2.5),
        (-40.414213562, -16.914213562, -2.5),
        (-40.414213562, 16.914213562, -2.5),
    ]]
    chamfer(chamfer1_edges, length=CHAMFER1_SIZE)

    # Sketch10 → Cut-Extrude14 (cut, two sides: drawn at the far end of the back side and taken through both)
    with BuildSketch(Plane(origin=(0, 0, 6), x_dir=(-1, 0, 0), z_dir=(0, 0, -1)).offset(-CUT_EXTRUDE14_DEPTH_BACK)):
        with Locations((-39, 15.5)):
            Circle(SKETCH10_R)
        with Locations((-16, 12.5)):
            Circle(SKETCH10_R)
        with Locations((39.003800828, 15.5)):
            Circle(SKETCH10_R)
        with Locations((39.003800828, -15.5)):
            Circle(SKETCH10_R)
        with Locations((-39, -15.5)):
            Circle(SKETCH10_R)
    extrude(amount=CUT_EXTRUDE14_DEPTH + CUT_EXTRUDE14_DEPTH_BACK, mode=Mode.SUBTRACT)

    # Sketch9<2> → Cut-Extrude12 (cut)
    with BuildSketch(Plane(origin=(0, 0, -2.5), x_dir=(-1, 0, 0), z_dir=(0, 0, -1)).offset(CUT_EXTRUDE12_START)):
        Rectangle(SKETCH9_2_W, SKETCH9_2_H)
    extrude(amount=CUT_EXTRUDE12_DEPTH, mode=Mode.SUBTRACT)

    # Sketch14 → Cut-Extrude16 (cut)
    with BuildSketch(Plane.XY.offset(12).offset(CUT_EXTRUDE16_START)):
        with Locations((-39.15, 0)):
            Rectangle(SKETCH14_W, SKETCH14_H)
        with Locations((0, -15.65)):
            Rectangle(SKETCH14_W_2, SKETCH14_H_2)
        with Locations((-11.25, 15.65)):
            Rectangle(SKETCH14_W_3, SKETCH14_H_2)
        with Locations((39.15, -4.15)):
            Rectangle(SKETCH14_W, SKETCH14_H_3)
    extrude(amount=-CUT_EXTRUDE16_DEPTH, mode=Mode.SUBTRACT)

    # Sketch15 → Cut-Extrude17 (cut)
    with SkipClean():  # the faces are left unmerged after this step: merging them gives an invalid solid
        with BuildSketch(Plane.XY.offset(-0.7).offset(CUT_EXTRUDE17_START)):
            with BuildLine():
                Line((-30, 9.583333333), (-33.509288015, 9.583333333))
                ThreePointArc((-33.509288015, 9.583333333), (-33.131655282, 8.96364418), (-33, 8.25))
                ThreePointArc((-33, 8.25), (-33.131655282, 7.53635582), (-33.509288015, 6.916666667))
                Line((-33.509288015, 6.916666667), (-30, 6.916666667))
                Line((-30, 6.916666667), (-30, 9.583333333))
            make_face()
            with BuildLine():
                Line((-30, -6.916666667), (-33.509288015, -6.916666667))
                ThreePointArc((-33.509288015, -6.916666667), (-33.131655282, -7.53635582), (-33, -8.25))
                ThreePointArc((-33, -8.25), (-33.131655282, -8.96364418), (-33.509288015, -9.583333333))
                Line((-33.509288015, -9.583333333), (-30, -9.583333333))
                Line((-30, -9.583333333), (-30, -6.916666667))
            make_face()
        extrude(amount=CUT_EXTRUDE17_DEPTH, mode=Mode.SUBTRACT)

    # Sketch16 → Cut-Extrude18 (cut)
    with SkipClean():  # the faces are left unmerged after this step: merging them gives an invalid solid
        with BuildSketch(Plane.XY.offset(4.7)):
            with Locations((-26.5, 13.875)):
                Rectangle(SKETCH16_W, SKETCH16_H)
        extrude(amount=-CUT_EXTRUDE18_DEPTH, mode=Mode.SUBTRACT)

    # Chamfer2
    chamfer2_edges = [part.edges().sort_by_distance(p)[0] for p in [
        (5.25, -0.25, -2.5),
        (-7.25, -8.25, -2.5),
        (-19.75, -0.25, -2.5),
        (-7.25, 7.75, -2.5),
    ]]
    chamfer(chamfer2_edges, length=CHAMFER2_SIZE)

    # Cut-Extrude19 outline → Cut-Extrude19 (cut)
    with SkipClean():  # the faces are left unmerged after this step: merging them gives an invalid solid
        with BuildSketch(Plane(origin=(0, 0, -2.5), x_dir=(-1, 0, 0), z_dir=(0, 0, -1)).offset(CUT_EXTRUDE19_START)):
            with BuildLine():
                Line((-28.00274578, -7.497433164), (-30.961284351, -10.455618193))
                ThreePointArc((-30.961284351, -10.455618193), (-31.214250116, -11.44266334), (-30.47046462, -12.139106401))
                ThreePointArc((-30.47046462, -12.139106401), (-24.191961209, -10.308613416), (-22.360717917, -4.030328805))
                ThreePointArc((-22.360717917, -4.030328805), (-23.057072086, -3.286460085), (-24.044147457, -3.53930789))
                Line((-24.044147457, -3.53930789), (-27.002686028, -6.497492919))
                Line((-27.002686028, -6.497492919), (-28.000000002, -5.500059753))
                ThreePointArc((-28.000000002, -5.500059753), (-29.707064528, -4.792850968), (-29.000059753, -6.499999998))
                Line((-29.000059753, -6.499999998), (-28.00274578, -7.497433164))
            make_face()
            with BuildLine():
                ThreePointArc((-28.999578741, 1.549999987), (-28.049521977, 2.49994322), (-28.99946521, 3.449999984))
                ThreePointArc((-28.99946521, 3.449999984), (-35.328227527, 0.828983834), (-37.949999984, -5.49946521))
                ThreePointArc((-37.949999984, -5.49946521), (-37.000056751, -6.449521974), (-36.049999987, -5.499578741))
                ThreePointArc((-36.049999987, -5.499578741), (-33.984804923, -0.514599326), (-28.999578741, 1.549999987))
            make_face()
            with BuildLine():
                ThreePointArc((-28.999817753, -2.450000005), (-28.049760989, -1.500056773), (-28.999704222, -0.550000009))
                ThreePointArc((-28.999704222, -0.550000009), (-32.499969414, -1.999612293), (-33.949999991, -5.499704222))
                ThreePointArc((-33.949999991, -5.499704222), (-33.000056759, -6.449760986), (-32.049999995, -5.499817753))
                ThreePointArc((-32.049999995, -5.499817753), (-31.156546811, -3.343195453), (-28.999817753, -2.450000005))
            make_face()
        extrude(amount=CUT_EXTRUDE19_DEPTH, mode=Mode.SUBTRACT)


solid = part.part
